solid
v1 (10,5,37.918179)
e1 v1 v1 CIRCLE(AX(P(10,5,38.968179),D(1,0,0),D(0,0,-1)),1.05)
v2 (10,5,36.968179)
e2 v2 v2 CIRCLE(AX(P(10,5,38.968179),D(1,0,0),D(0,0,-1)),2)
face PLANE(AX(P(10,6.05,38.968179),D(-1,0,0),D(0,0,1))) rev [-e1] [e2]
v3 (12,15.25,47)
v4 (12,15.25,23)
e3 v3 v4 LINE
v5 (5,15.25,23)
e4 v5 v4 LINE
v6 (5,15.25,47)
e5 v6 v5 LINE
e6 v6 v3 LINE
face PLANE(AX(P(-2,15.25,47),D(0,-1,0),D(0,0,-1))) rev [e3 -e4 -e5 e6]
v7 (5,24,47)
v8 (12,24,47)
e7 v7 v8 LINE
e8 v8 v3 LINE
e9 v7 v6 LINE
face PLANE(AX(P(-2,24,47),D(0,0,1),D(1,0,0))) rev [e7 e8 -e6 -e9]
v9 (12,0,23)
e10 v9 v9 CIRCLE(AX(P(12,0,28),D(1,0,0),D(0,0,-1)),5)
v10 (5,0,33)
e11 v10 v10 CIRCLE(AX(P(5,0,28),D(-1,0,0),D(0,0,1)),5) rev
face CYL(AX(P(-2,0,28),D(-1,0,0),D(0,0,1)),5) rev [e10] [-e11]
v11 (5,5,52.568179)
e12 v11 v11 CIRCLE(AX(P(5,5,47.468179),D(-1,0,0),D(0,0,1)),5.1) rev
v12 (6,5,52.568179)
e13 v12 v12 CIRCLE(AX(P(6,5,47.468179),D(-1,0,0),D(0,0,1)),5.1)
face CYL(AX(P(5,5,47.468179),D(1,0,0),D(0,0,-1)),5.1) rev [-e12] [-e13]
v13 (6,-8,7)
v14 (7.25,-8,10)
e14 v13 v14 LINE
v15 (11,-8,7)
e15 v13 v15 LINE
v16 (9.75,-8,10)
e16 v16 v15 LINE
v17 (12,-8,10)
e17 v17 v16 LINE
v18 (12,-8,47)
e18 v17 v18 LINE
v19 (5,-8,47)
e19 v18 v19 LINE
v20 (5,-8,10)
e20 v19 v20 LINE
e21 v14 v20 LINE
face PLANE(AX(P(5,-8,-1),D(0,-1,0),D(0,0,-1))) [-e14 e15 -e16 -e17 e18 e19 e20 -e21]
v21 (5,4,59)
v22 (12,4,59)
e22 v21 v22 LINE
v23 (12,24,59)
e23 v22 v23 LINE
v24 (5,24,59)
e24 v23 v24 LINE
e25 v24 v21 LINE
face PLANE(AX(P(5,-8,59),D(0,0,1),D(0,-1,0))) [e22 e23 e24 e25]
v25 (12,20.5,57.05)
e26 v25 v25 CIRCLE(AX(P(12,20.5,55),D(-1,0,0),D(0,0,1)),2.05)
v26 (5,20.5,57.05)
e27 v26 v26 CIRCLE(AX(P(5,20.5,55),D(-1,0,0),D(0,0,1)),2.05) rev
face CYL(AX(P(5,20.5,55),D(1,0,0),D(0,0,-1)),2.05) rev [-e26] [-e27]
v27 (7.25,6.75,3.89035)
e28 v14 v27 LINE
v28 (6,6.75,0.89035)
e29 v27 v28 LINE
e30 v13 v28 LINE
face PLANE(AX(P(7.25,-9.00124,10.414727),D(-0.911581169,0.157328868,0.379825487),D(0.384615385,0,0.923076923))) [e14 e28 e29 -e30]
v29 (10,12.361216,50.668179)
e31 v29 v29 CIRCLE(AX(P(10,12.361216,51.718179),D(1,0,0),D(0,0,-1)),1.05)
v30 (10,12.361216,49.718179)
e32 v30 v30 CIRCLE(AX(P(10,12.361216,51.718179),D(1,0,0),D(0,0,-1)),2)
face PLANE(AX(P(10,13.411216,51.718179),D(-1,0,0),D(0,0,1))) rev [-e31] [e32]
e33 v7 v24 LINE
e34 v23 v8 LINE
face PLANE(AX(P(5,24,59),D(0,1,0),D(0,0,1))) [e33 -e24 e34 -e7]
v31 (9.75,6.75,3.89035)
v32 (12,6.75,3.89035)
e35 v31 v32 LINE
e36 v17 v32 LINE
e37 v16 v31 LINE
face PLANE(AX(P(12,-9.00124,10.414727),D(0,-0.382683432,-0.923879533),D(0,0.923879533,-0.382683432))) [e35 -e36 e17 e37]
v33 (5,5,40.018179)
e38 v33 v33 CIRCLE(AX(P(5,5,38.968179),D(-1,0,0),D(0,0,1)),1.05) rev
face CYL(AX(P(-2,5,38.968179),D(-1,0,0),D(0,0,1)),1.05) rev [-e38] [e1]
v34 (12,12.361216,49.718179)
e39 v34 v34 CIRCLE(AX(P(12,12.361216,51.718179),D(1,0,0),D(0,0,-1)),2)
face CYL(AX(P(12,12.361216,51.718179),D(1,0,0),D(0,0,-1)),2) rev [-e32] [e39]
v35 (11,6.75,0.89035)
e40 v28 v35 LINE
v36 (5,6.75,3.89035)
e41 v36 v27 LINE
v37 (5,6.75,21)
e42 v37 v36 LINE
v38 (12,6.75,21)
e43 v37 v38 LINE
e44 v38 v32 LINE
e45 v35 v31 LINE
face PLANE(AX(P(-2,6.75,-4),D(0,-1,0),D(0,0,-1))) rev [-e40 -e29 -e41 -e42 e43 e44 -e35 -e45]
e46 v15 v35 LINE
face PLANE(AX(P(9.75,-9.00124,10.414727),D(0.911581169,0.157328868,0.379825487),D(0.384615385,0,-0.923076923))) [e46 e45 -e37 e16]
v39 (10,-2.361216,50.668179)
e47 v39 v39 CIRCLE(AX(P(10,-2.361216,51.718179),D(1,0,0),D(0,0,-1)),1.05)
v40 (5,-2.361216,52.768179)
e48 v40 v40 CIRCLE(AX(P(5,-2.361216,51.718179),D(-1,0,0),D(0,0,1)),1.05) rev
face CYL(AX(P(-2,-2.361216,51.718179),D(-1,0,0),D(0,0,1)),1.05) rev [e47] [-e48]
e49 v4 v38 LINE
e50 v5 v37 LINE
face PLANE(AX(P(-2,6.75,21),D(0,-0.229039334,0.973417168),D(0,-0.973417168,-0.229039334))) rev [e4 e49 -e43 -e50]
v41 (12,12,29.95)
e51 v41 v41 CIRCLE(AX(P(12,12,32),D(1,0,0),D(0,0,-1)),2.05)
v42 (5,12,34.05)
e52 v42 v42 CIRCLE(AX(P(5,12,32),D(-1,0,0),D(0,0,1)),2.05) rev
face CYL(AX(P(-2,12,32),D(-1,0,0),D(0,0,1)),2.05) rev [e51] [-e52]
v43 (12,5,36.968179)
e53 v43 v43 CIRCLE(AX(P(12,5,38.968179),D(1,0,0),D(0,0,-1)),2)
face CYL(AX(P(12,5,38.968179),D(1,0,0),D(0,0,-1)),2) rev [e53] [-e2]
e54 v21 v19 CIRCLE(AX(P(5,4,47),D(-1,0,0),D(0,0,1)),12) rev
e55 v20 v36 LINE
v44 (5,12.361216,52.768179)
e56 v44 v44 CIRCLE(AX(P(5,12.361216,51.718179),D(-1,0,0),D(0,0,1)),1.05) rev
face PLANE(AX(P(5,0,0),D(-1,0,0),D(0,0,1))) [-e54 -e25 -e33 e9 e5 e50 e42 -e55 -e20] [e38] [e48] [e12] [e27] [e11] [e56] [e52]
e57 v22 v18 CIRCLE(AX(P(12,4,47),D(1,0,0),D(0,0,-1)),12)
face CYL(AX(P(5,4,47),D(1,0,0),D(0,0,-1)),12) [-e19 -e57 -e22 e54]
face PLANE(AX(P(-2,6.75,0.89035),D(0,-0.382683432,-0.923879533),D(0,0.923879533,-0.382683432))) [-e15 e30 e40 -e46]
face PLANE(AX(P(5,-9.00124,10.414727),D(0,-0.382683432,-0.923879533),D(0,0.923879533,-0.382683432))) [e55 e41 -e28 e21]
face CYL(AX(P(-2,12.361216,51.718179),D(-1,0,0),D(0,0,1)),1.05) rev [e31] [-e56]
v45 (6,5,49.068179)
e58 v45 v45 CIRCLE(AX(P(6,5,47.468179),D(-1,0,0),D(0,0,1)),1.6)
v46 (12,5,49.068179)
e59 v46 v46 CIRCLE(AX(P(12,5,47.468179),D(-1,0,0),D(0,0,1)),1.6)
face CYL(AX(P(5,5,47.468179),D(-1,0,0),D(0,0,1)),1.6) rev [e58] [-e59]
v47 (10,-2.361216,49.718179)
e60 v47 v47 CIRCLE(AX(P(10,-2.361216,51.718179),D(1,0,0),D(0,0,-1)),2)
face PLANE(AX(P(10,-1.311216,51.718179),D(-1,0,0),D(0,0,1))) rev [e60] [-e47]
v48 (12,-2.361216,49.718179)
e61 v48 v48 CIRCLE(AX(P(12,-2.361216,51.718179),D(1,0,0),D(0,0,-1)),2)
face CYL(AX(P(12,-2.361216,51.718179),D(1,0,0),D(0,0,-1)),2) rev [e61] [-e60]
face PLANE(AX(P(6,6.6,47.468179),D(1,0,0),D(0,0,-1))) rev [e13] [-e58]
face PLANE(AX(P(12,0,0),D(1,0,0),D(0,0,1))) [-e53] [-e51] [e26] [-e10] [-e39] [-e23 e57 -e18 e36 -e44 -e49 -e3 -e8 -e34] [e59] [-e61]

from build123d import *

# Parameters (mm, degrees)
SKETCH1_W                                        = 32
SKETCH1_H                                        = 60
BOSS_EXTRUDE1_DEPTH                              = 7
SKETCH2_W                                        = 51
SKETCH2_H                                        = 8.75
CUT_EXTRUDE1_DEPTH                               = 65.078077374
CUT_EXTRUDE2_DEPTH                               = 65.078077374
F_10_0_10_DIAMETER_HOLE1_D                       = 10
F_10_0_10_DIAMETER_HOLE1_DEPTH                   = 14
M4X0_7_TAPPED_HOLE1_D                            = 2.1
M4X0_7_TAPPED_HOLE1_DEPTH                        = 14
M4X0_7_TAPPED_HOLE1_CBORE_D                      = 4
M4X0_7_TAPPED_HOLE1_CBORE_DEPTH                  = 2
CBORE_FOR_M3_HEX_HEAD_MACHINE_SCREW1_D           = 3.2
CBORE_FOR_M3_HEX_HEAD_MACHINE_SCREW1_CBORE_D     = 10.2
CBORE_FOR_M3_HEX_HEAD_MACHINE_SCREW1_CBORE_DEPTH = 1
F_4_1_4_1_DIAMETER_HOLE1_D                       = 4.1
F_4_1_4_1_DIAMETER_HOLE1_DEPTH                   = 14
F_4_1_4_1_DIAMETER_HOLE2_D                       = 4.1
FILLET3_R                                        = 12
CUT_EXTRUDE3_DEPTH                               = 65.078077374
SKETCH24_W                                       = 59.877724024
SKETCH24_H                                       = 41.345566777
CUT_EXTRUDE4_DEPTH                               = 7


# Read off the part's stored shape, not the designer's step: Mirror1
with BuildPart() as part:
    # Sketch1 → Boss-Extrude1 (new body)
    with BuildSketch(Plane(origin=(-2, 0, 0), x_dir=(0, -1, 0), z_dir=(-1, 0, 0))):
        with Locations((-8, 29)):
            Rectangle(SKETCH1_W, SKETCH1_H)
    extrude(amount=-BOSS_EXTRUDE1_DEPTH)

    # Sketch2 → Cut-Extrude1 (cut, through all)
    with BuildSketch(Plane(origin=(5, 0, 0), x_dir=(0, 0, -1), z_dir=(1, 0, 0))):
        with Locations((-21.5, 19.625)):
            Rectangle(SKETCH2_W, SKETCH2_H)
    extrude(amount=-CUT_EXTRUDE1_DEPTH, mode=Mode.SUBTRACT)

    # Sketch3 → Cut-Extrude2 (cut, through all)
    with BuildSketch(Plane(origin=(5, 0, 0), x_dir=(0, 0, -1), z_dir=(1, 0, 0))):
        Polygon((4, 6.75), (-21, 6.75), (-23, 15.25), (4, 15.25), align=None)
    extrude(amount=-CUT_EXTRUDE2_DEPTH, mode=Mode.SUBTRACT)

    # Ø10.0 (10) Diameter Hole1
    with Locations(Plane.ZY.offset(2)):
        with Locations((28, 0)):
            Hole(F_10_0_10_DIAMETER_HOLE1_D / 2, depth=F_10_0_10_DIAMETER_HOLE1_DEPTH)

    # M4x0.7 Tapped Hole1
    with Locations(Plane.ZY.offset(2)):
        with Locations((38.968179165, 5), (51.718179165, -2.361215932), (51.718179165, 12.361215932)):
            CounterBoreHole(M4X0_7_TAPPED_HOLE1_D / 2, M4X0_7_TAPPED_HOLE1_CBORE_D / 2, M4X0_7_TAPPED_HOLE1_CBORE_DEPTH, depth=M4X0_7_TAPPED_HOLE1_DEPTH)

    # CBORE for M3 Hex Head Machine Screw1 (through all)
    with Locations(Plane(origin=(5, 0, 0), x_dir=(0, 0, -1), z_dir=(1, 0, 0))):
        with Locations((-47.468179165, 5)):
            CounterBoreHole(CBORE_FOR_M3_HEX_HEAD_MACHINE_SCREW1_D / 2, CBORE_FOR_M3_HEX_HEAD_MACHINE_SCREW1_CBORE_D / 2, CBORE_FOR_M3_HEX_HEAD_MACHINE_SCREW1_CBORE_DEPTH)

    # Ø4.1 (4.1) Diameter Hole1
    with Locations(Plane.ZY.offset(2)):
        with Locations((32, 12)):
            Hole(F_4_1_4_1_DIAMETER_HOLE1_D / 2, depth=F_4_1_4_1_DIAMETER_HOLE1_DEPTH)

    # Ø4.1 (4.1) Diameter Hole2 (through all)
    with Locations(Plane(origin=(5, 0, 0), x_dir=(0, 0, -1), z_dir=(1, 0, 0))):
        with Locations((-55, 20.5)):
            Hole(F_4_1_4_1_DIAMETER_HOLE2_D / 2)

    # Fillet3
    fillet3_edges = [part.edges().sort_by_distance(p)[0] for p in [
        (1.5, -8, 59),
    ]]
    fillet(fillet3_edges, radius=FILLET3_R)

    # Cut-Sweep1: sweep along a path in Sketch22
    with BuildLine(Plane.ZY.offset(2)) as cut_sweep1_path:
        Line((-1, -8), (-8.402067684, 9.870172191))
    # Sketch21 → Cut-Sweep1 (sweep, cut)
    with BuildSketch(Plane.XZ.offset(8)):
        Polygon((-2, 10), (0.25, 10), (-1, 7), (-2, 7), align=None)
        Polygon((4, 7), (5, 7), (5, 10), (2.75, 10), align=None)
    sweep(path=cut_sweep1_path.line, mode=Mode.SUBTRACT)

    # Sketch23 → Cut-Extrude3 (cut, through all)
    with BuildSketch(Plane.ZY.offset(2)):
        Polygon((-1, 6.75), (0.890349955, 6.75), (7, -8), (-1, -8), align=None)
    extrude(amount=-CUT_EXTRUDE3_DEPTH, mode=Mode.SUBTRACT)

    # Mirror1: part across plane


with BuildPart() as part_1:
    add(part.part)
    add(part.part.mirror(Plane.ZY.offset(-5)))

    # Sketch24 → Cut-Extrude4 (cut)
    with BuildSketch(Plane.ZY.offset(2)):
        with Locations((29.938862012, 9.46680503)):
            Rectangle(SKETCH24_W, SKETCH24_H)
    extrude(amount=-CUT_EXTRUDE4_DEPTH, mode=Mode.SUBTRACT)


solid = part_1.part
